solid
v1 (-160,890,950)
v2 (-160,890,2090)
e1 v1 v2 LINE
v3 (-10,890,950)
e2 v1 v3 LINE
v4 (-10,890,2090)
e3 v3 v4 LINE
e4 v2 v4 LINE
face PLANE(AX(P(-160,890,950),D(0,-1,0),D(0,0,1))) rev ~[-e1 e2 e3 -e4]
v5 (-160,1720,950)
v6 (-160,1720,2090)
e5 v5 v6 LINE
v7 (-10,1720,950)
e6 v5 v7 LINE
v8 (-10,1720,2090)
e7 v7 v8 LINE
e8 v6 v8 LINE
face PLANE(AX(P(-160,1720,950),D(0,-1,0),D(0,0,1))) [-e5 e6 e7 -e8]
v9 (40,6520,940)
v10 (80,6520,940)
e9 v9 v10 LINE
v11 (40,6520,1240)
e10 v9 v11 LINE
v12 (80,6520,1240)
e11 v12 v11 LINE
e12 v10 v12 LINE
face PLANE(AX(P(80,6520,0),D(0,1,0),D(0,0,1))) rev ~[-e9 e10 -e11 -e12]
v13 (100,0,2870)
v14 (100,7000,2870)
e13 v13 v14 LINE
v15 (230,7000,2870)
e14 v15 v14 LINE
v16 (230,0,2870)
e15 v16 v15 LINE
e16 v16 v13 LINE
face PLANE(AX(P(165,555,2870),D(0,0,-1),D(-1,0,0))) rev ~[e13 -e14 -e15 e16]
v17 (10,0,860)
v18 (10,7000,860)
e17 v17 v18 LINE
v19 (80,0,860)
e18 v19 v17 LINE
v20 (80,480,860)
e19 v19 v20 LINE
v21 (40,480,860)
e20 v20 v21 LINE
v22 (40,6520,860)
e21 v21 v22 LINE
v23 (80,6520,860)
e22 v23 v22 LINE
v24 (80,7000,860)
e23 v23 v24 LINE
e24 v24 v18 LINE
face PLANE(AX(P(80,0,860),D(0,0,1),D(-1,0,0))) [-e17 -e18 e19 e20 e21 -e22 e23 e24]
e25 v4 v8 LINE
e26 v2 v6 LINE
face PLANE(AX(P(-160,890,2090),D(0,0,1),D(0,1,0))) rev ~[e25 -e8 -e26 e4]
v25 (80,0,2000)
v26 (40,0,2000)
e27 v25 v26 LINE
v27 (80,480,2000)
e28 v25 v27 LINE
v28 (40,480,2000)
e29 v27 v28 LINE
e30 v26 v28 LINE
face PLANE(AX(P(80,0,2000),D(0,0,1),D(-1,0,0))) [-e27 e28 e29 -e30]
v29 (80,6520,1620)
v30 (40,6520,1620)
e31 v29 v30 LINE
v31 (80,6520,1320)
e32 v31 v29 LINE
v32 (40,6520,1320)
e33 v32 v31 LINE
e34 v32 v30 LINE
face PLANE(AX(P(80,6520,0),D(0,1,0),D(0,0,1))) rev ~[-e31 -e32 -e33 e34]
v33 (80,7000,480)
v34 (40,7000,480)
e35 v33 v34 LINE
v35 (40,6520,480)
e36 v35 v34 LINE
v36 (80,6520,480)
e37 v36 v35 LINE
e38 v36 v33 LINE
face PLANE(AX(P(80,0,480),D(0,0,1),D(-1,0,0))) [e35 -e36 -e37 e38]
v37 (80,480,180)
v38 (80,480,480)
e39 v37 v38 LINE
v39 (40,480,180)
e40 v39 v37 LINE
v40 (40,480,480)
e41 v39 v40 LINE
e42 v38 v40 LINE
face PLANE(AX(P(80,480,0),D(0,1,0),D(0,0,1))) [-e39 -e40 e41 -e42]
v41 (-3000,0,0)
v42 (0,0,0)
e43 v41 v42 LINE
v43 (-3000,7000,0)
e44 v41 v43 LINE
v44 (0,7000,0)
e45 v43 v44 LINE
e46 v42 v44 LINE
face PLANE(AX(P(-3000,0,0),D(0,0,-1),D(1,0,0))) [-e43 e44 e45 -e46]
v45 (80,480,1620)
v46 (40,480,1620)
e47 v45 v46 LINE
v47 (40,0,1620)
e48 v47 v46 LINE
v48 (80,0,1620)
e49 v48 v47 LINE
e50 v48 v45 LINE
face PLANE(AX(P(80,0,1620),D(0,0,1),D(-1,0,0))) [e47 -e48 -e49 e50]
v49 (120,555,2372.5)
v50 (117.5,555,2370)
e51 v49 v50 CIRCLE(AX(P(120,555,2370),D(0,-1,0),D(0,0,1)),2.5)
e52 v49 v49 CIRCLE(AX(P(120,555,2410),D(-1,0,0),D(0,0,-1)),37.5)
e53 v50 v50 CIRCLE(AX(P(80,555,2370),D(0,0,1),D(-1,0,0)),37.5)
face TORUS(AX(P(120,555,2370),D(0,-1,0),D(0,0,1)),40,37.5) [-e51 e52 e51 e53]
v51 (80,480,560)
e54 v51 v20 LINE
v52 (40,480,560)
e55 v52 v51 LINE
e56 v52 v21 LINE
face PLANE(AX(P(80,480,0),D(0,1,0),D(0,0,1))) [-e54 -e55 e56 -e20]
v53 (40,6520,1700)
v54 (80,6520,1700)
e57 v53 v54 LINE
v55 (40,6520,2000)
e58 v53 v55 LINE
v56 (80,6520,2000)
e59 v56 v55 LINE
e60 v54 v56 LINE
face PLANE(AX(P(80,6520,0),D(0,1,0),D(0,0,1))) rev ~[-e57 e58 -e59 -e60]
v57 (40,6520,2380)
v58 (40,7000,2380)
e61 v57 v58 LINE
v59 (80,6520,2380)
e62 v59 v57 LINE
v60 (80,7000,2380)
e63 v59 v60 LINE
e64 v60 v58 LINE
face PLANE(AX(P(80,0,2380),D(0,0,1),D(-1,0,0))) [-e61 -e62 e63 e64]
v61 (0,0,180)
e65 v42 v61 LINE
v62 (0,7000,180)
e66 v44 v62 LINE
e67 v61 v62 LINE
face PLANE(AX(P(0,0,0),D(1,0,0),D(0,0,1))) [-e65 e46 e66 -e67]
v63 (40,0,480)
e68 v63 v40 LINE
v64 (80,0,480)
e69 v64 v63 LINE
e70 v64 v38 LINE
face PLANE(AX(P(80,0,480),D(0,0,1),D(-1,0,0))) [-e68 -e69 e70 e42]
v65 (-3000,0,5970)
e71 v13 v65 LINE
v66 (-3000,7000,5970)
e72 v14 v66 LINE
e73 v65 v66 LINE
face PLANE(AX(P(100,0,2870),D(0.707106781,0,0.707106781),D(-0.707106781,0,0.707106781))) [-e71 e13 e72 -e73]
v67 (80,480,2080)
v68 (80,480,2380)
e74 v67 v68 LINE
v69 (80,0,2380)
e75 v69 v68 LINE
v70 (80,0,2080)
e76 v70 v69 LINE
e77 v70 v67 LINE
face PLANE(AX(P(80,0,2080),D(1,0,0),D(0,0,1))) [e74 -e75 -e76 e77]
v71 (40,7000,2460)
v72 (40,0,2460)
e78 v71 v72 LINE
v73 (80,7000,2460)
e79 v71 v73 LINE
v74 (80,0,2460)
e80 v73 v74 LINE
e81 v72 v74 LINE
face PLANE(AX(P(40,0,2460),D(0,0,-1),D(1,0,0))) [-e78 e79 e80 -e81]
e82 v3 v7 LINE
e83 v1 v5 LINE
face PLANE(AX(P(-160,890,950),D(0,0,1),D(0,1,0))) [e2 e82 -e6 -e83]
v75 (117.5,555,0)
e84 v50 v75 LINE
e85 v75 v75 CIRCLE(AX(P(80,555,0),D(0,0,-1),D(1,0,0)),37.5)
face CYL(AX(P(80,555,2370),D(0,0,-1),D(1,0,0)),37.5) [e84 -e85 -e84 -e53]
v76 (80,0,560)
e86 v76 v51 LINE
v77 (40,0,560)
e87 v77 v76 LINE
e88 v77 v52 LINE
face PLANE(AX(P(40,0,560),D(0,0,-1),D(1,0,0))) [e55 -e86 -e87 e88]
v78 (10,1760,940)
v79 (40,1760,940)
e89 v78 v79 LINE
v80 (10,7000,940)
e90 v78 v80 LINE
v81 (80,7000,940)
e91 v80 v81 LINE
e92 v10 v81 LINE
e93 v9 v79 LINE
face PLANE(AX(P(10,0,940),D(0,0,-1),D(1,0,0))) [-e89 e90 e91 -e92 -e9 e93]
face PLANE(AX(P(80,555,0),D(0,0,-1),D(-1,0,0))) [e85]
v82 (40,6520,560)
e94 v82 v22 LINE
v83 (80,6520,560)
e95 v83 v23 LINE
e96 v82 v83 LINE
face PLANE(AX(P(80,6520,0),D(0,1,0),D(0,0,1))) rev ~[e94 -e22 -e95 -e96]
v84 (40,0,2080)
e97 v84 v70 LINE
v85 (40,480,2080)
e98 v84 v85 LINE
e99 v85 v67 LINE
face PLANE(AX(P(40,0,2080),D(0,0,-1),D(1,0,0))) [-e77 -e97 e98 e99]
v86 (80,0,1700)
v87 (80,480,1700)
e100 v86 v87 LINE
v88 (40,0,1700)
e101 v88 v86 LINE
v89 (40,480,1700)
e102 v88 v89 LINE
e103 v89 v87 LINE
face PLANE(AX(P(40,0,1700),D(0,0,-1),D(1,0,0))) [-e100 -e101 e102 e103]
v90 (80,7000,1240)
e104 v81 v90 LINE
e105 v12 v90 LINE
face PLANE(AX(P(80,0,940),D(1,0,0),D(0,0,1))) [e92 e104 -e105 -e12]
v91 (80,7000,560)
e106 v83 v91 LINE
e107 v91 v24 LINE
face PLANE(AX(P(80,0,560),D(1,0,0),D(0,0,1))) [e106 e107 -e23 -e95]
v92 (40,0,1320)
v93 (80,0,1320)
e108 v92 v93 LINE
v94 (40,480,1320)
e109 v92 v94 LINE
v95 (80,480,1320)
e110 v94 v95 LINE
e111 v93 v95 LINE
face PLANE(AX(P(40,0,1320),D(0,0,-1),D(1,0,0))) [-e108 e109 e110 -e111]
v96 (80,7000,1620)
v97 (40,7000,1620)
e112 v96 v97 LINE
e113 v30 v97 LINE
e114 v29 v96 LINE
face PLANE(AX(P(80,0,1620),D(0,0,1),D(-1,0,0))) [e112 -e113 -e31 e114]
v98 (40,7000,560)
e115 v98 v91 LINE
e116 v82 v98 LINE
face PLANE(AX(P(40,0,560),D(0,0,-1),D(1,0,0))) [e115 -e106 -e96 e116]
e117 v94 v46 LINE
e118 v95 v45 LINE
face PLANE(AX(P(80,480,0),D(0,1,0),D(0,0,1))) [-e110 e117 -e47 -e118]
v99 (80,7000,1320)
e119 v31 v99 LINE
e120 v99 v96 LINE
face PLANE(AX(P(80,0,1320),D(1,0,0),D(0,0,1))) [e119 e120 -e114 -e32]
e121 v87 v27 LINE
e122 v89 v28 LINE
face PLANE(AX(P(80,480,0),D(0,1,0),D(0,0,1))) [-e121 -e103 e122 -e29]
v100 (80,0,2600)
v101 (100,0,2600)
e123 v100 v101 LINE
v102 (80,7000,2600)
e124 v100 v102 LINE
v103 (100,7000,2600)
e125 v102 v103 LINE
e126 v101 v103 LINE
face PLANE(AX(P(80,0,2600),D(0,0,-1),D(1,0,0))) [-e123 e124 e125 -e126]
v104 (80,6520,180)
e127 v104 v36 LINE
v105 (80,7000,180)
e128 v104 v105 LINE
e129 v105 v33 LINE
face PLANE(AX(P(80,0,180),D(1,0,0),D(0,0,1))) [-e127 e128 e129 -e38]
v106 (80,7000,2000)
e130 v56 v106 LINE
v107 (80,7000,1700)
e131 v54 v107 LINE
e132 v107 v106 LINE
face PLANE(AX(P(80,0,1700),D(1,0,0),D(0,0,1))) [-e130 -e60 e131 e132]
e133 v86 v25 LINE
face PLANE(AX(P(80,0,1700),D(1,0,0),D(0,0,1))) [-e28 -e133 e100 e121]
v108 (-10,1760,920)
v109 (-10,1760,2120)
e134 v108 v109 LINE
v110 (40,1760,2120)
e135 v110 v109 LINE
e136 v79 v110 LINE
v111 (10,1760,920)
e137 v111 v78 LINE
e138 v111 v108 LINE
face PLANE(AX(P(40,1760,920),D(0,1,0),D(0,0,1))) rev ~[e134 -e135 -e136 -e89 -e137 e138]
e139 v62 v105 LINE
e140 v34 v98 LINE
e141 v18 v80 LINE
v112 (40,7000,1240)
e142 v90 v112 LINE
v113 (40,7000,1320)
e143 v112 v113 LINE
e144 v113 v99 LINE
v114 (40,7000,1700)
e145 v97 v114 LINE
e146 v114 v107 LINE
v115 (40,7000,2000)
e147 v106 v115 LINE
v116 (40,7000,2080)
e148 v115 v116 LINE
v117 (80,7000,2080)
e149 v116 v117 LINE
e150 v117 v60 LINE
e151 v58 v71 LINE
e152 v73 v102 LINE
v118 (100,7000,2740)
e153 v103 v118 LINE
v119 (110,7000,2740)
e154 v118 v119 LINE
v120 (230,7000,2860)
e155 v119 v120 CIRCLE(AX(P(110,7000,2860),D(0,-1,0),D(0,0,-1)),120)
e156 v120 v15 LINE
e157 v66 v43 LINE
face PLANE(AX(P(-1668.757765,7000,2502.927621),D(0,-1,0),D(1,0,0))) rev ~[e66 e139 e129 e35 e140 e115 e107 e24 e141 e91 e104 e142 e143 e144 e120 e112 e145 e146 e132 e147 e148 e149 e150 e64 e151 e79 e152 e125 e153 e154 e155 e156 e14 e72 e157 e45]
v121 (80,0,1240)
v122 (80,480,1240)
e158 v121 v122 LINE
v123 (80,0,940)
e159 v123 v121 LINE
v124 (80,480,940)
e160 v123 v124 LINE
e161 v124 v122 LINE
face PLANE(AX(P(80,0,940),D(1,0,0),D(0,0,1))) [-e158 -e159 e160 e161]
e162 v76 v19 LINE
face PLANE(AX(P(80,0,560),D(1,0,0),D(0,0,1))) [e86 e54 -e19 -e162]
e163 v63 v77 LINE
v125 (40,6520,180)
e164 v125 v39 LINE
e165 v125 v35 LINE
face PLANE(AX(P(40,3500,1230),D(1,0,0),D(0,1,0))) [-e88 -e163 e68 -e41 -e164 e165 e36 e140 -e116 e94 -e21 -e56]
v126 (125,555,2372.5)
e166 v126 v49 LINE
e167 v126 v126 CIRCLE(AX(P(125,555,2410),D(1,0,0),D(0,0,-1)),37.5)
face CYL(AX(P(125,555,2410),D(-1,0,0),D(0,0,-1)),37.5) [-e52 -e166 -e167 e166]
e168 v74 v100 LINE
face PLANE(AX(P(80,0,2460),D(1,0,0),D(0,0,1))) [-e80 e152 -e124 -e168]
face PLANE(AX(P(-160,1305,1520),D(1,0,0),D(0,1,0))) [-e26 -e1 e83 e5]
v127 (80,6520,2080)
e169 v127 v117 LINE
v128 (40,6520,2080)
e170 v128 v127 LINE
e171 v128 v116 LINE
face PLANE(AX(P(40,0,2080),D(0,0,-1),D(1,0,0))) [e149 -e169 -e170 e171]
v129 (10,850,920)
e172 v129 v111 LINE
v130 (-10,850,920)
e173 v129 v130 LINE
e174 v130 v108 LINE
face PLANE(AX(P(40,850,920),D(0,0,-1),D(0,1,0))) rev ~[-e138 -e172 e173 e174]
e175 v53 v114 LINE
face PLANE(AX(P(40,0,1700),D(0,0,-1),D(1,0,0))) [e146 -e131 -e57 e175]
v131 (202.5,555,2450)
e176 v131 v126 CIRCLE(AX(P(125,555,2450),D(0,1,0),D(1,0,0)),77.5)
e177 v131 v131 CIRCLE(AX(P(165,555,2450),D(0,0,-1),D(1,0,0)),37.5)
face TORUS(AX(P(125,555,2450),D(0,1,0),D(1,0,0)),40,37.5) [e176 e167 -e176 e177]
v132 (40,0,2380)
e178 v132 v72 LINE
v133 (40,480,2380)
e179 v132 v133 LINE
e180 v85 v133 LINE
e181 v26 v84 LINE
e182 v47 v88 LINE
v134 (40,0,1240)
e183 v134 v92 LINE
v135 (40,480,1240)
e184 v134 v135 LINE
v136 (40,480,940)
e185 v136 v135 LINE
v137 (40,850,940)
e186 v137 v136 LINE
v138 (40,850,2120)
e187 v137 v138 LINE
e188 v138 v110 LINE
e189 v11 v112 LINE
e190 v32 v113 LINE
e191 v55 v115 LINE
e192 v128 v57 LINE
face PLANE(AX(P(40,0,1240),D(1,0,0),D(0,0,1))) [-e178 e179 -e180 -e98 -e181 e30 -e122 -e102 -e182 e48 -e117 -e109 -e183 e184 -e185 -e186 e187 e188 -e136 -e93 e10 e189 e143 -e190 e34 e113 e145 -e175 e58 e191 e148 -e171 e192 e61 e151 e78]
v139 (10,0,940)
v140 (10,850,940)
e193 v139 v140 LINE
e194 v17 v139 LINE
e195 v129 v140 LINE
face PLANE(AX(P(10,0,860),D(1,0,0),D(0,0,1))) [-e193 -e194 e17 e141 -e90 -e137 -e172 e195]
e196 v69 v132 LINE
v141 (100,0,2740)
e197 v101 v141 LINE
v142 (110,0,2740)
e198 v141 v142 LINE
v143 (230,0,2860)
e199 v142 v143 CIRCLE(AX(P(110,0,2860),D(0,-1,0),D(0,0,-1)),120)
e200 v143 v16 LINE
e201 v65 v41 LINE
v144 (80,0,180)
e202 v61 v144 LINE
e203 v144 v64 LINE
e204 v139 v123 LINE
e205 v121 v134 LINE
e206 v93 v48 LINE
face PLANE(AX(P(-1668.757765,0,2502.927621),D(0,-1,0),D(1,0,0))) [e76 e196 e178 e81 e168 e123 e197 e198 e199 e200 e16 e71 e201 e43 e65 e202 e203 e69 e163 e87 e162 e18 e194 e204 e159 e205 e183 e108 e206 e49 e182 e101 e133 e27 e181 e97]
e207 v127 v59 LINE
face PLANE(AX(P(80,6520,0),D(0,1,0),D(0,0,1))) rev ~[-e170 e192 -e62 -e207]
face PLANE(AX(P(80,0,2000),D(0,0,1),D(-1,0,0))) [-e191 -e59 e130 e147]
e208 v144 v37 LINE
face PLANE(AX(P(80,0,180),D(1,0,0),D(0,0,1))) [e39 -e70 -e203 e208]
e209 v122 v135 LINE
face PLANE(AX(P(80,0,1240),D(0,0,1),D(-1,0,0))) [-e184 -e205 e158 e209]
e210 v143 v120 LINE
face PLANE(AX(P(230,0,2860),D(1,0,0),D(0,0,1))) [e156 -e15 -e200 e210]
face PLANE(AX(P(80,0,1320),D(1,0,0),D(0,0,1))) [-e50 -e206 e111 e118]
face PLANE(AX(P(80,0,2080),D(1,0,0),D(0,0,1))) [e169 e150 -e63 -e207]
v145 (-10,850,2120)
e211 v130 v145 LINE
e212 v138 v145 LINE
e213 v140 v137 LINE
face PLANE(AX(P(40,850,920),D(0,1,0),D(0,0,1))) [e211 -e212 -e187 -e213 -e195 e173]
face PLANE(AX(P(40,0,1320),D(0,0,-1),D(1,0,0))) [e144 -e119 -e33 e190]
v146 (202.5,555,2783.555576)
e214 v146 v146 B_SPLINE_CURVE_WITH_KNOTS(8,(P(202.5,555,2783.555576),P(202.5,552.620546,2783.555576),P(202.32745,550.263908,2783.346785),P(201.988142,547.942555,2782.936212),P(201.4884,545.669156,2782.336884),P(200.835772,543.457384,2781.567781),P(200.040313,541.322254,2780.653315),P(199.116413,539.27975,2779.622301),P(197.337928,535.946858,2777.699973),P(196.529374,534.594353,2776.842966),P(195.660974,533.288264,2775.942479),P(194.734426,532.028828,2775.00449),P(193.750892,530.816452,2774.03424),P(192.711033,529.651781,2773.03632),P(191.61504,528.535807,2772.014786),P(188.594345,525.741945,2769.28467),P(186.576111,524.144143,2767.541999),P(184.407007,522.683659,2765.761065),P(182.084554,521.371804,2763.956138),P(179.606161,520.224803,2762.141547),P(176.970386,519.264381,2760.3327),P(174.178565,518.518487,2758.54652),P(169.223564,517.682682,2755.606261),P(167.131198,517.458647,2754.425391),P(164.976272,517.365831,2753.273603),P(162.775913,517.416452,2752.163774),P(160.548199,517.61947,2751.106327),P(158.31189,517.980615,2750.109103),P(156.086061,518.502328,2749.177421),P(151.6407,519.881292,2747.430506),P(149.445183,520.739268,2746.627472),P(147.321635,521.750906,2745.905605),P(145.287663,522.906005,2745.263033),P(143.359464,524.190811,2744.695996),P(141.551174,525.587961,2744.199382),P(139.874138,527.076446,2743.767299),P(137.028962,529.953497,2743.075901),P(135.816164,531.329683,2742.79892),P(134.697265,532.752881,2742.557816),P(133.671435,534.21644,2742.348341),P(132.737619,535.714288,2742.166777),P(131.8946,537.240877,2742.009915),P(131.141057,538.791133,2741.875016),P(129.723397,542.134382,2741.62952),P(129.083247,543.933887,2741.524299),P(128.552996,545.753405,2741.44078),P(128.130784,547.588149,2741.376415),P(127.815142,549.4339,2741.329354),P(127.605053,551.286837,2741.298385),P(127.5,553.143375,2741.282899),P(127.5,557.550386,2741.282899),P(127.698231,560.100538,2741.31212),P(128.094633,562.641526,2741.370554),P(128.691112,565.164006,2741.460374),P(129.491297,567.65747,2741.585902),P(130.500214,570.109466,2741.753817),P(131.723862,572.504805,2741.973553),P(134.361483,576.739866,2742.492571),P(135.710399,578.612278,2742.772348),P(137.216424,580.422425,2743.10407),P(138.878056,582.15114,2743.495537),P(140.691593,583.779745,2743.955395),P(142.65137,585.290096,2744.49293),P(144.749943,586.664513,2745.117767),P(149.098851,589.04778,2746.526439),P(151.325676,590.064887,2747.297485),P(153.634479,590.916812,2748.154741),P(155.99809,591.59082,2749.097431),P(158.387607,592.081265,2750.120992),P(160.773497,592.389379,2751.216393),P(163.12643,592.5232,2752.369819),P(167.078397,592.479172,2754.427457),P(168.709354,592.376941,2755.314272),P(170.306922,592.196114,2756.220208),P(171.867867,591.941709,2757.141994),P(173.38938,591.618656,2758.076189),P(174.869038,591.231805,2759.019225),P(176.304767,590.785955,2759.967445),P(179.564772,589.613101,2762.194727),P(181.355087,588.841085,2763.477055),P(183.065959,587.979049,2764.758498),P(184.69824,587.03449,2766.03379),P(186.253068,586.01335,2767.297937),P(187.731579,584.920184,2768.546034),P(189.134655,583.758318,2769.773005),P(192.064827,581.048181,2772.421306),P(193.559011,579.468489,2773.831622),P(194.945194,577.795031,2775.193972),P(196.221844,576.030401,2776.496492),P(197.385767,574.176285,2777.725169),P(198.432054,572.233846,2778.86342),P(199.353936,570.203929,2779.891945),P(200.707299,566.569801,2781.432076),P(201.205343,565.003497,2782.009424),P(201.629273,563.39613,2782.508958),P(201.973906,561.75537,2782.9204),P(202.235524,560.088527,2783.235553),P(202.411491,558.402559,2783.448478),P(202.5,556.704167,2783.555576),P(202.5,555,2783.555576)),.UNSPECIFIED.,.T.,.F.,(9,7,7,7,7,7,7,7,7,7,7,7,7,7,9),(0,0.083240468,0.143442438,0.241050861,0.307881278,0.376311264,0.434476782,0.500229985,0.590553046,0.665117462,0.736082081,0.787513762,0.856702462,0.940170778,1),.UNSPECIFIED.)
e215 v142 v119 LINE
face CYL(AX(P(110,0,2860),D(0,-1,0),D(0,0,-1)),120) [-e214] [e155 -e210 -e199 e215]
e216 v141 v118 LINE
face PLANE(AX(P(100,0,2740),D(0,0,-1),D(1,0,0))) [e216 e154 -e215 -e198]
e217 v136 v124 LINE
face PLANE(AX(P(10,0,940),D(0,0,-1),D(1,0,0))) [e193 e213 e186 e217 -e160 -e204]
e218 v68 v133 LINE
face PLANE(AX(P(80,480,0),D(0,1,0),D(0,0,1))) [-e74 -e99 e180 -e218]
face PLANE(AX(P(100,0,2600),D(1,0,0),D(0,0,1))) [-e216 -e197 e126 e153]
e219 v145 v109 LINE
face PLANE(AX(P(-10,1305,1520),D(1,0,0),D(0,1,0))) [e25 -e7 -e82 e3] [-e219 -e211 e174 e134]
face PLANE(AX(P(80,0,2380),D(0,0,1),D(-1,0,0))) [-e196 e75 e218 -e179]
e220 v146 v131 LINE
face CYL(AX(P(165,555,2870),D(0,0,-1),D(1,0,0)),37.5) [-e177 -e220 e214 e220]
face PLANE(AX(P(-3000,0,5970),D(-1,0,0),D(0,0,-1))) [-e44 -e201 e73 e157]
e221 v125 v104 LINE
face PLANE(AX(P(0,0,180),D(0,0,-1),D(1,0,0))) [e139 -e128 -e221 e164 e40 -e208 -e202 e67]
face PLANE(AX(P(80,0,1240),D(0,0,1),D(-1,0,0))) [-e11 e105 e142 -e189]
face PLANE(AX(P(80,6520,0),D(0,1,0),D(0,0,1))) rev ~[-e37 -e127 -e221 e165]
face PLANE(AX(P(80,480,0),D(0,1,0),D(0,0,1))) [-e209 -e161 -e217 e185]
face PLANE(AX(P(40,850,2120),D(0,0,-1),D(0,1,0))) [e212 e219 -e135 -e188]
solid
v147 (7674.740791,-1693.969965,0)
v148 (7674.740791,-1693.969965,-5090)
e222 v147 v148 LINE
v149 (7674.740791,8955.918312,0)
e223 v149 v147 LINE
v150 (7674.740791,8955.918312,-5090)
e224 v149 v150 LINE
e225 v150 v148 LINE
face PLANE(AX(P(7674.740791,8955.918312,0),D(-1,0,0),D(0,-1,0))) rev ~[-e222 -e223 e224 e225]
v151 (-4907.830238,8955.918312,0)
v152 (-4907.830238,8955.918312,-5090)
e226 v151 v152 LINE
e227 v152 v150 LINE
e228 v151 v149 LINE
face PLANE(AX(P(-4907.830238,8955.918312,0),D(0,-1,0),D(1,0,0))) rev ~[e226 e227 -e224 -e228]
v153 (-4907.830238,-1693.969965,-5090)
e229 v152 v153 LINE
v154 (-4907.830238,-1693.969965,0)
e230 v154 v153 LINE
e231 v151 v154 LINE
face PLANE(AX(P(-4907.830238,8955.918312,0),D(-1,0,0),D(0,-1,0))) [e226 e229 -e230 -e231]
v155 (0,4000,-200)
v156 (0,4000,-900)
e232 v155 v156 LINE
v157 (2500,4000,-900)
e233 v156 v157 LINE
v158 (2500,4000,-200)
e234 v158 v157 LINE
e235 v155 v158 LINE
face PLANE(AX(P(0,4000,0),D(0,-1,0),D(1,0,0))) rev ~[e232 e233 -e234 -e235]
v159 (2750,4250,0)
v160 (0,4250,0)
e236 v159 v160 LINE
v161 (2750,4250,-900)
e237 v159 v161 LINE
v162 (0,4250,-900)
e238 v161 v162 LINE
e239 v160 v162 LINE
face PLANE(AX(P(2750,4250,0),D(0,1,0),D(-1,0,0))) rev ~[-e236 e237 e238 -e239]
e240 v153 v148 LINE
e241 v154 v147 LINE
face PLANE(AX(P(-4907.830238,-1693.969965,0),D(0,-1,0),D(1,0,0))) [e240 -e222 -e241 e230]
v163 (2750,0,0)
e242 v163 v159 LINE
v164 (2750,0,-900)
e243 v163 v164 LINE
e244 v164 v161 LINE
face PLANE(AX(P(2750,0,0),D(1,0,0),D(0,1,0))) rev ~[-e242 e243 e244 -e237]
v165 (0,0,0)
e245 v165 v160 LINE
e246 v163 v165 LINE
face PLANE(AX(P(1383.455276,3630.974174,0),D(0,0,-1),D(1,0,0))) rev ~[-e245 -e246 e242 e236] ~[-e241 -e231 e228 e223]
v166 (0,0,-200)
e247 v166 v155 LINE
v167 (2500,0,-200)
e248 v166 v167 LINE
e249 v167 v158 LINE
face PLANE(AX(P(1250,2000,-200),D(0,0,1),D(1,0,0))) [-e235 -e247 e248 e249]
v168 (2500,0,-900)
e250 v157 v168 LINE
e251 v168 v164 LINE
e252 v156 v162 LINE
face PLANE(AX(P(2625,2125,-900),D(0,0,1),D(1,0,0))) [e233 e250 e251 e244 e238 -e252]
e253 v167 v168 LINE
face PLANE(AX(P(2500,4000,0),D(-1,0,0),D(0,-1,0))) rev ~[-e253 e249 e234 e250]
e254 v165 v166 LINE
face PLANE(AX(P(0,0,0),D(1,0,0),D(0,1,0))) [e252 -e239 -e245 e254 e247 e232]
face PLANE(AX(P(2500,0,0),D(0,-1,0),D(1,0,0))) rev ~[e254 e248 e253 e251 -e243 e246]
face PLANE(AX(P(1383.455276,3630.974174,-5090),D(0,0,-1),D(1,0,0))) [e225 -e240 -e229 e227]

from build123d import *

# Parameters (mm, degrees)
F1_DEPTH  = 7000
F2_W      = 6040
F2_H      = 2460
F3_DEPTH  = 40
F6_R      = 37.5
F8_W      = 910
F8_H      = 1200
F9_DEPTH  = 200
F10_W     = 910
F10_H     = 1200
F10_W_2   = 830
F10_H_2   = 1140
F11_DEPTH = 150
F12_W     = 12582.5710296631
F12_H     = 10649.8882770538
F12_W_2   = 3000
F12_H_2   = 7000
F13_DEPTH = 5090
F14_W     = 2500
F14_H     = 4000
F15_DEPTH = 200
F14_H_2   = 250
F16_DEPTH = 900


# Not quite as in the source:
# - a feature names something its author has since deleted; it is built from what else it names


with BuildPart() as f1:
    # F0 (on Front) → F1 (new body)
    with BuildSketch(Plane.XZ):
        with BuildLine():
            Line((0, 180), (80, 180))
            Line((80, 180), (80, 480))
            Line((80, 480), (40, 480))
            Line((40, 480), (40, 560))
            Line((40, 560), (80, 560))
            Line((80, 560), (80, 860))
            Line((80, 860), (10, 860))
            Line((10, 860), (10, 940))
            Line((10, 940), (80, 940))
            Line((80, 940), (80, 1240))
            Line((80, 1240), (40, 1240))
            Line((40, 1240), (40, 1320))
            Line((40, 1320), (80, 1320))
            Line((80, 1320), (80, 1620))
            Line((80, 1620), (40, 1620))
            Line((40, 1620), (40, 1700))
            Line((40, 1700), (80, 1700))
            Line((80, 1700), (80, 2000))
            Line((80, 2000), (40, 2000))
            Line((40, 2000), (40, 2080))
            Line((40, 2080), (80, 2080))
            Line((80, 2080), (80, 2380))
            Line((80, 2380), (40, 2380))
            Line((40, 2380), (40, 2460))
            Line((40, 2460), (80, 2460))
            Line((80, 2460), (80, 2600))
            Line((80, 2600), (100, 2600))
            Line((100, 2600), (100, 2740))
            Line((100, 2740), (110, 2740))
            ThreePointArc((110, 2740), (194.8528137424, 2775.1471862576), (230, 2860))
            Line((230, 2860), (230, 2870))
            Line((230, 2870), (100, 2870))
            Line((100, 2870), (-3000, 5970))
            Line((-3000, 5970), (-3000, 0))
            Line((-3000, 0), (0, 0))
            Line((0, 0), (0, 180))
        make_face()
    extrude(amount=-F1_DEPTH)

    # F2 (on face) → F3 (cut, through all)
    with BuildSketch(Plane.YZ.offset(80)):
        with Locations((3500, 1230)):
            Rectangle(F2_W, F2_H)
    extrude(amount=-F3_DEPTH, mode=Mode.SUBTRACT)

    # F7: sweep along a path in F5
    with BuildLine(Plane(origin=(0, 555, 0), x_dir=(-1, 0, 0), z_dir=(0, 1, 0))) as f7_path:
        Line((-165, 2870), (-165, 2450))
        ThreePointArc((-165, 2450), (-153.2842712475, 2421.7157287525), (-125, 2410))
        Line((-125, 2410), (-120, 2410))
        ThreePointArc((-120, 2410), (-91.7157287525, 2398.2842712475), (-80, 2370))
        Line((-80, 2370), (-80, 0))
    # F6 (on face) → F7 (sweep)
    with BuildSketch(Plane(origin=(0, 0, 0), x_dir=(1, 0, 0), z_dir=(0, 0, -1))):
        with Locations((80, -555)):
            Circle(F6_R)
    sweep(path=f7_path.line)

    # F8 (on face) → F9 (cut)
    with BuildSketch(Plane.YZ.offset(40)):
        with Locations((1305, 1520)):
            Rectangle(F8_W, F8_H)
    extrude(amount=-F9_DEPTH, mode=Mode.SUBTRACT)

    # F10 (on face) → F11 (join)
    with BuildSketch(Plane.YZ.offset(-160)):
        with Locations((1305, 1520)):
            Rectangle(F10_W, F10_H)
        with Locations((1305, 1520)):
            Rectangle(F10_W_2, F10_H_2, mode=Mode.SUBTRACT)
    extrude(amount=F11_DEPTH)


with BuildPart() as f13:
    # F12 (on face) → F13 (new body)
    with BuildSketch(Plane(origin=(0, 0, 0), x_dir=(1, 0, 0), z_dir=(0, 0, -1))):
        with Locations((1383.4552764893, -3630.9741735458)):
            Rectangle(F12_W, F12_H)
        with Locations((-1500, -3500)):
            Rectangle(F12_W_2, F12_H_2, mode=Mode.SUBTRACT)
        with Locations((-1500, -3500)):
            Rectangle(F12_W_2, F12_H_2)
    extrude(amount=F13_DEPTH)

    # F14 (on face) → F15 (cut)
    with BuildSketch(Plane.XY):
        with Locations((1250, 2000)):
            Rectangle(F14_W, F14_H)
    extrude(amount=-F15_DEPTH, mode=Mode.SUBTRACT)

    # F14 (on face) → F16 (cut)
    with BuildSketch(Plane.XY):
        Polygon((2500, 4000), (2500, 0), (2750, 0), (2750, 4250), (2500, 4250), align=None)
        with Locations((1250, 4125)):
            Rectangle(F14_W, F14_H_2)
    extrude(amount=-F16_DEPTH, mode=Mode.SUBTRACT)


solid = Compound([f1.part, f13.part])
